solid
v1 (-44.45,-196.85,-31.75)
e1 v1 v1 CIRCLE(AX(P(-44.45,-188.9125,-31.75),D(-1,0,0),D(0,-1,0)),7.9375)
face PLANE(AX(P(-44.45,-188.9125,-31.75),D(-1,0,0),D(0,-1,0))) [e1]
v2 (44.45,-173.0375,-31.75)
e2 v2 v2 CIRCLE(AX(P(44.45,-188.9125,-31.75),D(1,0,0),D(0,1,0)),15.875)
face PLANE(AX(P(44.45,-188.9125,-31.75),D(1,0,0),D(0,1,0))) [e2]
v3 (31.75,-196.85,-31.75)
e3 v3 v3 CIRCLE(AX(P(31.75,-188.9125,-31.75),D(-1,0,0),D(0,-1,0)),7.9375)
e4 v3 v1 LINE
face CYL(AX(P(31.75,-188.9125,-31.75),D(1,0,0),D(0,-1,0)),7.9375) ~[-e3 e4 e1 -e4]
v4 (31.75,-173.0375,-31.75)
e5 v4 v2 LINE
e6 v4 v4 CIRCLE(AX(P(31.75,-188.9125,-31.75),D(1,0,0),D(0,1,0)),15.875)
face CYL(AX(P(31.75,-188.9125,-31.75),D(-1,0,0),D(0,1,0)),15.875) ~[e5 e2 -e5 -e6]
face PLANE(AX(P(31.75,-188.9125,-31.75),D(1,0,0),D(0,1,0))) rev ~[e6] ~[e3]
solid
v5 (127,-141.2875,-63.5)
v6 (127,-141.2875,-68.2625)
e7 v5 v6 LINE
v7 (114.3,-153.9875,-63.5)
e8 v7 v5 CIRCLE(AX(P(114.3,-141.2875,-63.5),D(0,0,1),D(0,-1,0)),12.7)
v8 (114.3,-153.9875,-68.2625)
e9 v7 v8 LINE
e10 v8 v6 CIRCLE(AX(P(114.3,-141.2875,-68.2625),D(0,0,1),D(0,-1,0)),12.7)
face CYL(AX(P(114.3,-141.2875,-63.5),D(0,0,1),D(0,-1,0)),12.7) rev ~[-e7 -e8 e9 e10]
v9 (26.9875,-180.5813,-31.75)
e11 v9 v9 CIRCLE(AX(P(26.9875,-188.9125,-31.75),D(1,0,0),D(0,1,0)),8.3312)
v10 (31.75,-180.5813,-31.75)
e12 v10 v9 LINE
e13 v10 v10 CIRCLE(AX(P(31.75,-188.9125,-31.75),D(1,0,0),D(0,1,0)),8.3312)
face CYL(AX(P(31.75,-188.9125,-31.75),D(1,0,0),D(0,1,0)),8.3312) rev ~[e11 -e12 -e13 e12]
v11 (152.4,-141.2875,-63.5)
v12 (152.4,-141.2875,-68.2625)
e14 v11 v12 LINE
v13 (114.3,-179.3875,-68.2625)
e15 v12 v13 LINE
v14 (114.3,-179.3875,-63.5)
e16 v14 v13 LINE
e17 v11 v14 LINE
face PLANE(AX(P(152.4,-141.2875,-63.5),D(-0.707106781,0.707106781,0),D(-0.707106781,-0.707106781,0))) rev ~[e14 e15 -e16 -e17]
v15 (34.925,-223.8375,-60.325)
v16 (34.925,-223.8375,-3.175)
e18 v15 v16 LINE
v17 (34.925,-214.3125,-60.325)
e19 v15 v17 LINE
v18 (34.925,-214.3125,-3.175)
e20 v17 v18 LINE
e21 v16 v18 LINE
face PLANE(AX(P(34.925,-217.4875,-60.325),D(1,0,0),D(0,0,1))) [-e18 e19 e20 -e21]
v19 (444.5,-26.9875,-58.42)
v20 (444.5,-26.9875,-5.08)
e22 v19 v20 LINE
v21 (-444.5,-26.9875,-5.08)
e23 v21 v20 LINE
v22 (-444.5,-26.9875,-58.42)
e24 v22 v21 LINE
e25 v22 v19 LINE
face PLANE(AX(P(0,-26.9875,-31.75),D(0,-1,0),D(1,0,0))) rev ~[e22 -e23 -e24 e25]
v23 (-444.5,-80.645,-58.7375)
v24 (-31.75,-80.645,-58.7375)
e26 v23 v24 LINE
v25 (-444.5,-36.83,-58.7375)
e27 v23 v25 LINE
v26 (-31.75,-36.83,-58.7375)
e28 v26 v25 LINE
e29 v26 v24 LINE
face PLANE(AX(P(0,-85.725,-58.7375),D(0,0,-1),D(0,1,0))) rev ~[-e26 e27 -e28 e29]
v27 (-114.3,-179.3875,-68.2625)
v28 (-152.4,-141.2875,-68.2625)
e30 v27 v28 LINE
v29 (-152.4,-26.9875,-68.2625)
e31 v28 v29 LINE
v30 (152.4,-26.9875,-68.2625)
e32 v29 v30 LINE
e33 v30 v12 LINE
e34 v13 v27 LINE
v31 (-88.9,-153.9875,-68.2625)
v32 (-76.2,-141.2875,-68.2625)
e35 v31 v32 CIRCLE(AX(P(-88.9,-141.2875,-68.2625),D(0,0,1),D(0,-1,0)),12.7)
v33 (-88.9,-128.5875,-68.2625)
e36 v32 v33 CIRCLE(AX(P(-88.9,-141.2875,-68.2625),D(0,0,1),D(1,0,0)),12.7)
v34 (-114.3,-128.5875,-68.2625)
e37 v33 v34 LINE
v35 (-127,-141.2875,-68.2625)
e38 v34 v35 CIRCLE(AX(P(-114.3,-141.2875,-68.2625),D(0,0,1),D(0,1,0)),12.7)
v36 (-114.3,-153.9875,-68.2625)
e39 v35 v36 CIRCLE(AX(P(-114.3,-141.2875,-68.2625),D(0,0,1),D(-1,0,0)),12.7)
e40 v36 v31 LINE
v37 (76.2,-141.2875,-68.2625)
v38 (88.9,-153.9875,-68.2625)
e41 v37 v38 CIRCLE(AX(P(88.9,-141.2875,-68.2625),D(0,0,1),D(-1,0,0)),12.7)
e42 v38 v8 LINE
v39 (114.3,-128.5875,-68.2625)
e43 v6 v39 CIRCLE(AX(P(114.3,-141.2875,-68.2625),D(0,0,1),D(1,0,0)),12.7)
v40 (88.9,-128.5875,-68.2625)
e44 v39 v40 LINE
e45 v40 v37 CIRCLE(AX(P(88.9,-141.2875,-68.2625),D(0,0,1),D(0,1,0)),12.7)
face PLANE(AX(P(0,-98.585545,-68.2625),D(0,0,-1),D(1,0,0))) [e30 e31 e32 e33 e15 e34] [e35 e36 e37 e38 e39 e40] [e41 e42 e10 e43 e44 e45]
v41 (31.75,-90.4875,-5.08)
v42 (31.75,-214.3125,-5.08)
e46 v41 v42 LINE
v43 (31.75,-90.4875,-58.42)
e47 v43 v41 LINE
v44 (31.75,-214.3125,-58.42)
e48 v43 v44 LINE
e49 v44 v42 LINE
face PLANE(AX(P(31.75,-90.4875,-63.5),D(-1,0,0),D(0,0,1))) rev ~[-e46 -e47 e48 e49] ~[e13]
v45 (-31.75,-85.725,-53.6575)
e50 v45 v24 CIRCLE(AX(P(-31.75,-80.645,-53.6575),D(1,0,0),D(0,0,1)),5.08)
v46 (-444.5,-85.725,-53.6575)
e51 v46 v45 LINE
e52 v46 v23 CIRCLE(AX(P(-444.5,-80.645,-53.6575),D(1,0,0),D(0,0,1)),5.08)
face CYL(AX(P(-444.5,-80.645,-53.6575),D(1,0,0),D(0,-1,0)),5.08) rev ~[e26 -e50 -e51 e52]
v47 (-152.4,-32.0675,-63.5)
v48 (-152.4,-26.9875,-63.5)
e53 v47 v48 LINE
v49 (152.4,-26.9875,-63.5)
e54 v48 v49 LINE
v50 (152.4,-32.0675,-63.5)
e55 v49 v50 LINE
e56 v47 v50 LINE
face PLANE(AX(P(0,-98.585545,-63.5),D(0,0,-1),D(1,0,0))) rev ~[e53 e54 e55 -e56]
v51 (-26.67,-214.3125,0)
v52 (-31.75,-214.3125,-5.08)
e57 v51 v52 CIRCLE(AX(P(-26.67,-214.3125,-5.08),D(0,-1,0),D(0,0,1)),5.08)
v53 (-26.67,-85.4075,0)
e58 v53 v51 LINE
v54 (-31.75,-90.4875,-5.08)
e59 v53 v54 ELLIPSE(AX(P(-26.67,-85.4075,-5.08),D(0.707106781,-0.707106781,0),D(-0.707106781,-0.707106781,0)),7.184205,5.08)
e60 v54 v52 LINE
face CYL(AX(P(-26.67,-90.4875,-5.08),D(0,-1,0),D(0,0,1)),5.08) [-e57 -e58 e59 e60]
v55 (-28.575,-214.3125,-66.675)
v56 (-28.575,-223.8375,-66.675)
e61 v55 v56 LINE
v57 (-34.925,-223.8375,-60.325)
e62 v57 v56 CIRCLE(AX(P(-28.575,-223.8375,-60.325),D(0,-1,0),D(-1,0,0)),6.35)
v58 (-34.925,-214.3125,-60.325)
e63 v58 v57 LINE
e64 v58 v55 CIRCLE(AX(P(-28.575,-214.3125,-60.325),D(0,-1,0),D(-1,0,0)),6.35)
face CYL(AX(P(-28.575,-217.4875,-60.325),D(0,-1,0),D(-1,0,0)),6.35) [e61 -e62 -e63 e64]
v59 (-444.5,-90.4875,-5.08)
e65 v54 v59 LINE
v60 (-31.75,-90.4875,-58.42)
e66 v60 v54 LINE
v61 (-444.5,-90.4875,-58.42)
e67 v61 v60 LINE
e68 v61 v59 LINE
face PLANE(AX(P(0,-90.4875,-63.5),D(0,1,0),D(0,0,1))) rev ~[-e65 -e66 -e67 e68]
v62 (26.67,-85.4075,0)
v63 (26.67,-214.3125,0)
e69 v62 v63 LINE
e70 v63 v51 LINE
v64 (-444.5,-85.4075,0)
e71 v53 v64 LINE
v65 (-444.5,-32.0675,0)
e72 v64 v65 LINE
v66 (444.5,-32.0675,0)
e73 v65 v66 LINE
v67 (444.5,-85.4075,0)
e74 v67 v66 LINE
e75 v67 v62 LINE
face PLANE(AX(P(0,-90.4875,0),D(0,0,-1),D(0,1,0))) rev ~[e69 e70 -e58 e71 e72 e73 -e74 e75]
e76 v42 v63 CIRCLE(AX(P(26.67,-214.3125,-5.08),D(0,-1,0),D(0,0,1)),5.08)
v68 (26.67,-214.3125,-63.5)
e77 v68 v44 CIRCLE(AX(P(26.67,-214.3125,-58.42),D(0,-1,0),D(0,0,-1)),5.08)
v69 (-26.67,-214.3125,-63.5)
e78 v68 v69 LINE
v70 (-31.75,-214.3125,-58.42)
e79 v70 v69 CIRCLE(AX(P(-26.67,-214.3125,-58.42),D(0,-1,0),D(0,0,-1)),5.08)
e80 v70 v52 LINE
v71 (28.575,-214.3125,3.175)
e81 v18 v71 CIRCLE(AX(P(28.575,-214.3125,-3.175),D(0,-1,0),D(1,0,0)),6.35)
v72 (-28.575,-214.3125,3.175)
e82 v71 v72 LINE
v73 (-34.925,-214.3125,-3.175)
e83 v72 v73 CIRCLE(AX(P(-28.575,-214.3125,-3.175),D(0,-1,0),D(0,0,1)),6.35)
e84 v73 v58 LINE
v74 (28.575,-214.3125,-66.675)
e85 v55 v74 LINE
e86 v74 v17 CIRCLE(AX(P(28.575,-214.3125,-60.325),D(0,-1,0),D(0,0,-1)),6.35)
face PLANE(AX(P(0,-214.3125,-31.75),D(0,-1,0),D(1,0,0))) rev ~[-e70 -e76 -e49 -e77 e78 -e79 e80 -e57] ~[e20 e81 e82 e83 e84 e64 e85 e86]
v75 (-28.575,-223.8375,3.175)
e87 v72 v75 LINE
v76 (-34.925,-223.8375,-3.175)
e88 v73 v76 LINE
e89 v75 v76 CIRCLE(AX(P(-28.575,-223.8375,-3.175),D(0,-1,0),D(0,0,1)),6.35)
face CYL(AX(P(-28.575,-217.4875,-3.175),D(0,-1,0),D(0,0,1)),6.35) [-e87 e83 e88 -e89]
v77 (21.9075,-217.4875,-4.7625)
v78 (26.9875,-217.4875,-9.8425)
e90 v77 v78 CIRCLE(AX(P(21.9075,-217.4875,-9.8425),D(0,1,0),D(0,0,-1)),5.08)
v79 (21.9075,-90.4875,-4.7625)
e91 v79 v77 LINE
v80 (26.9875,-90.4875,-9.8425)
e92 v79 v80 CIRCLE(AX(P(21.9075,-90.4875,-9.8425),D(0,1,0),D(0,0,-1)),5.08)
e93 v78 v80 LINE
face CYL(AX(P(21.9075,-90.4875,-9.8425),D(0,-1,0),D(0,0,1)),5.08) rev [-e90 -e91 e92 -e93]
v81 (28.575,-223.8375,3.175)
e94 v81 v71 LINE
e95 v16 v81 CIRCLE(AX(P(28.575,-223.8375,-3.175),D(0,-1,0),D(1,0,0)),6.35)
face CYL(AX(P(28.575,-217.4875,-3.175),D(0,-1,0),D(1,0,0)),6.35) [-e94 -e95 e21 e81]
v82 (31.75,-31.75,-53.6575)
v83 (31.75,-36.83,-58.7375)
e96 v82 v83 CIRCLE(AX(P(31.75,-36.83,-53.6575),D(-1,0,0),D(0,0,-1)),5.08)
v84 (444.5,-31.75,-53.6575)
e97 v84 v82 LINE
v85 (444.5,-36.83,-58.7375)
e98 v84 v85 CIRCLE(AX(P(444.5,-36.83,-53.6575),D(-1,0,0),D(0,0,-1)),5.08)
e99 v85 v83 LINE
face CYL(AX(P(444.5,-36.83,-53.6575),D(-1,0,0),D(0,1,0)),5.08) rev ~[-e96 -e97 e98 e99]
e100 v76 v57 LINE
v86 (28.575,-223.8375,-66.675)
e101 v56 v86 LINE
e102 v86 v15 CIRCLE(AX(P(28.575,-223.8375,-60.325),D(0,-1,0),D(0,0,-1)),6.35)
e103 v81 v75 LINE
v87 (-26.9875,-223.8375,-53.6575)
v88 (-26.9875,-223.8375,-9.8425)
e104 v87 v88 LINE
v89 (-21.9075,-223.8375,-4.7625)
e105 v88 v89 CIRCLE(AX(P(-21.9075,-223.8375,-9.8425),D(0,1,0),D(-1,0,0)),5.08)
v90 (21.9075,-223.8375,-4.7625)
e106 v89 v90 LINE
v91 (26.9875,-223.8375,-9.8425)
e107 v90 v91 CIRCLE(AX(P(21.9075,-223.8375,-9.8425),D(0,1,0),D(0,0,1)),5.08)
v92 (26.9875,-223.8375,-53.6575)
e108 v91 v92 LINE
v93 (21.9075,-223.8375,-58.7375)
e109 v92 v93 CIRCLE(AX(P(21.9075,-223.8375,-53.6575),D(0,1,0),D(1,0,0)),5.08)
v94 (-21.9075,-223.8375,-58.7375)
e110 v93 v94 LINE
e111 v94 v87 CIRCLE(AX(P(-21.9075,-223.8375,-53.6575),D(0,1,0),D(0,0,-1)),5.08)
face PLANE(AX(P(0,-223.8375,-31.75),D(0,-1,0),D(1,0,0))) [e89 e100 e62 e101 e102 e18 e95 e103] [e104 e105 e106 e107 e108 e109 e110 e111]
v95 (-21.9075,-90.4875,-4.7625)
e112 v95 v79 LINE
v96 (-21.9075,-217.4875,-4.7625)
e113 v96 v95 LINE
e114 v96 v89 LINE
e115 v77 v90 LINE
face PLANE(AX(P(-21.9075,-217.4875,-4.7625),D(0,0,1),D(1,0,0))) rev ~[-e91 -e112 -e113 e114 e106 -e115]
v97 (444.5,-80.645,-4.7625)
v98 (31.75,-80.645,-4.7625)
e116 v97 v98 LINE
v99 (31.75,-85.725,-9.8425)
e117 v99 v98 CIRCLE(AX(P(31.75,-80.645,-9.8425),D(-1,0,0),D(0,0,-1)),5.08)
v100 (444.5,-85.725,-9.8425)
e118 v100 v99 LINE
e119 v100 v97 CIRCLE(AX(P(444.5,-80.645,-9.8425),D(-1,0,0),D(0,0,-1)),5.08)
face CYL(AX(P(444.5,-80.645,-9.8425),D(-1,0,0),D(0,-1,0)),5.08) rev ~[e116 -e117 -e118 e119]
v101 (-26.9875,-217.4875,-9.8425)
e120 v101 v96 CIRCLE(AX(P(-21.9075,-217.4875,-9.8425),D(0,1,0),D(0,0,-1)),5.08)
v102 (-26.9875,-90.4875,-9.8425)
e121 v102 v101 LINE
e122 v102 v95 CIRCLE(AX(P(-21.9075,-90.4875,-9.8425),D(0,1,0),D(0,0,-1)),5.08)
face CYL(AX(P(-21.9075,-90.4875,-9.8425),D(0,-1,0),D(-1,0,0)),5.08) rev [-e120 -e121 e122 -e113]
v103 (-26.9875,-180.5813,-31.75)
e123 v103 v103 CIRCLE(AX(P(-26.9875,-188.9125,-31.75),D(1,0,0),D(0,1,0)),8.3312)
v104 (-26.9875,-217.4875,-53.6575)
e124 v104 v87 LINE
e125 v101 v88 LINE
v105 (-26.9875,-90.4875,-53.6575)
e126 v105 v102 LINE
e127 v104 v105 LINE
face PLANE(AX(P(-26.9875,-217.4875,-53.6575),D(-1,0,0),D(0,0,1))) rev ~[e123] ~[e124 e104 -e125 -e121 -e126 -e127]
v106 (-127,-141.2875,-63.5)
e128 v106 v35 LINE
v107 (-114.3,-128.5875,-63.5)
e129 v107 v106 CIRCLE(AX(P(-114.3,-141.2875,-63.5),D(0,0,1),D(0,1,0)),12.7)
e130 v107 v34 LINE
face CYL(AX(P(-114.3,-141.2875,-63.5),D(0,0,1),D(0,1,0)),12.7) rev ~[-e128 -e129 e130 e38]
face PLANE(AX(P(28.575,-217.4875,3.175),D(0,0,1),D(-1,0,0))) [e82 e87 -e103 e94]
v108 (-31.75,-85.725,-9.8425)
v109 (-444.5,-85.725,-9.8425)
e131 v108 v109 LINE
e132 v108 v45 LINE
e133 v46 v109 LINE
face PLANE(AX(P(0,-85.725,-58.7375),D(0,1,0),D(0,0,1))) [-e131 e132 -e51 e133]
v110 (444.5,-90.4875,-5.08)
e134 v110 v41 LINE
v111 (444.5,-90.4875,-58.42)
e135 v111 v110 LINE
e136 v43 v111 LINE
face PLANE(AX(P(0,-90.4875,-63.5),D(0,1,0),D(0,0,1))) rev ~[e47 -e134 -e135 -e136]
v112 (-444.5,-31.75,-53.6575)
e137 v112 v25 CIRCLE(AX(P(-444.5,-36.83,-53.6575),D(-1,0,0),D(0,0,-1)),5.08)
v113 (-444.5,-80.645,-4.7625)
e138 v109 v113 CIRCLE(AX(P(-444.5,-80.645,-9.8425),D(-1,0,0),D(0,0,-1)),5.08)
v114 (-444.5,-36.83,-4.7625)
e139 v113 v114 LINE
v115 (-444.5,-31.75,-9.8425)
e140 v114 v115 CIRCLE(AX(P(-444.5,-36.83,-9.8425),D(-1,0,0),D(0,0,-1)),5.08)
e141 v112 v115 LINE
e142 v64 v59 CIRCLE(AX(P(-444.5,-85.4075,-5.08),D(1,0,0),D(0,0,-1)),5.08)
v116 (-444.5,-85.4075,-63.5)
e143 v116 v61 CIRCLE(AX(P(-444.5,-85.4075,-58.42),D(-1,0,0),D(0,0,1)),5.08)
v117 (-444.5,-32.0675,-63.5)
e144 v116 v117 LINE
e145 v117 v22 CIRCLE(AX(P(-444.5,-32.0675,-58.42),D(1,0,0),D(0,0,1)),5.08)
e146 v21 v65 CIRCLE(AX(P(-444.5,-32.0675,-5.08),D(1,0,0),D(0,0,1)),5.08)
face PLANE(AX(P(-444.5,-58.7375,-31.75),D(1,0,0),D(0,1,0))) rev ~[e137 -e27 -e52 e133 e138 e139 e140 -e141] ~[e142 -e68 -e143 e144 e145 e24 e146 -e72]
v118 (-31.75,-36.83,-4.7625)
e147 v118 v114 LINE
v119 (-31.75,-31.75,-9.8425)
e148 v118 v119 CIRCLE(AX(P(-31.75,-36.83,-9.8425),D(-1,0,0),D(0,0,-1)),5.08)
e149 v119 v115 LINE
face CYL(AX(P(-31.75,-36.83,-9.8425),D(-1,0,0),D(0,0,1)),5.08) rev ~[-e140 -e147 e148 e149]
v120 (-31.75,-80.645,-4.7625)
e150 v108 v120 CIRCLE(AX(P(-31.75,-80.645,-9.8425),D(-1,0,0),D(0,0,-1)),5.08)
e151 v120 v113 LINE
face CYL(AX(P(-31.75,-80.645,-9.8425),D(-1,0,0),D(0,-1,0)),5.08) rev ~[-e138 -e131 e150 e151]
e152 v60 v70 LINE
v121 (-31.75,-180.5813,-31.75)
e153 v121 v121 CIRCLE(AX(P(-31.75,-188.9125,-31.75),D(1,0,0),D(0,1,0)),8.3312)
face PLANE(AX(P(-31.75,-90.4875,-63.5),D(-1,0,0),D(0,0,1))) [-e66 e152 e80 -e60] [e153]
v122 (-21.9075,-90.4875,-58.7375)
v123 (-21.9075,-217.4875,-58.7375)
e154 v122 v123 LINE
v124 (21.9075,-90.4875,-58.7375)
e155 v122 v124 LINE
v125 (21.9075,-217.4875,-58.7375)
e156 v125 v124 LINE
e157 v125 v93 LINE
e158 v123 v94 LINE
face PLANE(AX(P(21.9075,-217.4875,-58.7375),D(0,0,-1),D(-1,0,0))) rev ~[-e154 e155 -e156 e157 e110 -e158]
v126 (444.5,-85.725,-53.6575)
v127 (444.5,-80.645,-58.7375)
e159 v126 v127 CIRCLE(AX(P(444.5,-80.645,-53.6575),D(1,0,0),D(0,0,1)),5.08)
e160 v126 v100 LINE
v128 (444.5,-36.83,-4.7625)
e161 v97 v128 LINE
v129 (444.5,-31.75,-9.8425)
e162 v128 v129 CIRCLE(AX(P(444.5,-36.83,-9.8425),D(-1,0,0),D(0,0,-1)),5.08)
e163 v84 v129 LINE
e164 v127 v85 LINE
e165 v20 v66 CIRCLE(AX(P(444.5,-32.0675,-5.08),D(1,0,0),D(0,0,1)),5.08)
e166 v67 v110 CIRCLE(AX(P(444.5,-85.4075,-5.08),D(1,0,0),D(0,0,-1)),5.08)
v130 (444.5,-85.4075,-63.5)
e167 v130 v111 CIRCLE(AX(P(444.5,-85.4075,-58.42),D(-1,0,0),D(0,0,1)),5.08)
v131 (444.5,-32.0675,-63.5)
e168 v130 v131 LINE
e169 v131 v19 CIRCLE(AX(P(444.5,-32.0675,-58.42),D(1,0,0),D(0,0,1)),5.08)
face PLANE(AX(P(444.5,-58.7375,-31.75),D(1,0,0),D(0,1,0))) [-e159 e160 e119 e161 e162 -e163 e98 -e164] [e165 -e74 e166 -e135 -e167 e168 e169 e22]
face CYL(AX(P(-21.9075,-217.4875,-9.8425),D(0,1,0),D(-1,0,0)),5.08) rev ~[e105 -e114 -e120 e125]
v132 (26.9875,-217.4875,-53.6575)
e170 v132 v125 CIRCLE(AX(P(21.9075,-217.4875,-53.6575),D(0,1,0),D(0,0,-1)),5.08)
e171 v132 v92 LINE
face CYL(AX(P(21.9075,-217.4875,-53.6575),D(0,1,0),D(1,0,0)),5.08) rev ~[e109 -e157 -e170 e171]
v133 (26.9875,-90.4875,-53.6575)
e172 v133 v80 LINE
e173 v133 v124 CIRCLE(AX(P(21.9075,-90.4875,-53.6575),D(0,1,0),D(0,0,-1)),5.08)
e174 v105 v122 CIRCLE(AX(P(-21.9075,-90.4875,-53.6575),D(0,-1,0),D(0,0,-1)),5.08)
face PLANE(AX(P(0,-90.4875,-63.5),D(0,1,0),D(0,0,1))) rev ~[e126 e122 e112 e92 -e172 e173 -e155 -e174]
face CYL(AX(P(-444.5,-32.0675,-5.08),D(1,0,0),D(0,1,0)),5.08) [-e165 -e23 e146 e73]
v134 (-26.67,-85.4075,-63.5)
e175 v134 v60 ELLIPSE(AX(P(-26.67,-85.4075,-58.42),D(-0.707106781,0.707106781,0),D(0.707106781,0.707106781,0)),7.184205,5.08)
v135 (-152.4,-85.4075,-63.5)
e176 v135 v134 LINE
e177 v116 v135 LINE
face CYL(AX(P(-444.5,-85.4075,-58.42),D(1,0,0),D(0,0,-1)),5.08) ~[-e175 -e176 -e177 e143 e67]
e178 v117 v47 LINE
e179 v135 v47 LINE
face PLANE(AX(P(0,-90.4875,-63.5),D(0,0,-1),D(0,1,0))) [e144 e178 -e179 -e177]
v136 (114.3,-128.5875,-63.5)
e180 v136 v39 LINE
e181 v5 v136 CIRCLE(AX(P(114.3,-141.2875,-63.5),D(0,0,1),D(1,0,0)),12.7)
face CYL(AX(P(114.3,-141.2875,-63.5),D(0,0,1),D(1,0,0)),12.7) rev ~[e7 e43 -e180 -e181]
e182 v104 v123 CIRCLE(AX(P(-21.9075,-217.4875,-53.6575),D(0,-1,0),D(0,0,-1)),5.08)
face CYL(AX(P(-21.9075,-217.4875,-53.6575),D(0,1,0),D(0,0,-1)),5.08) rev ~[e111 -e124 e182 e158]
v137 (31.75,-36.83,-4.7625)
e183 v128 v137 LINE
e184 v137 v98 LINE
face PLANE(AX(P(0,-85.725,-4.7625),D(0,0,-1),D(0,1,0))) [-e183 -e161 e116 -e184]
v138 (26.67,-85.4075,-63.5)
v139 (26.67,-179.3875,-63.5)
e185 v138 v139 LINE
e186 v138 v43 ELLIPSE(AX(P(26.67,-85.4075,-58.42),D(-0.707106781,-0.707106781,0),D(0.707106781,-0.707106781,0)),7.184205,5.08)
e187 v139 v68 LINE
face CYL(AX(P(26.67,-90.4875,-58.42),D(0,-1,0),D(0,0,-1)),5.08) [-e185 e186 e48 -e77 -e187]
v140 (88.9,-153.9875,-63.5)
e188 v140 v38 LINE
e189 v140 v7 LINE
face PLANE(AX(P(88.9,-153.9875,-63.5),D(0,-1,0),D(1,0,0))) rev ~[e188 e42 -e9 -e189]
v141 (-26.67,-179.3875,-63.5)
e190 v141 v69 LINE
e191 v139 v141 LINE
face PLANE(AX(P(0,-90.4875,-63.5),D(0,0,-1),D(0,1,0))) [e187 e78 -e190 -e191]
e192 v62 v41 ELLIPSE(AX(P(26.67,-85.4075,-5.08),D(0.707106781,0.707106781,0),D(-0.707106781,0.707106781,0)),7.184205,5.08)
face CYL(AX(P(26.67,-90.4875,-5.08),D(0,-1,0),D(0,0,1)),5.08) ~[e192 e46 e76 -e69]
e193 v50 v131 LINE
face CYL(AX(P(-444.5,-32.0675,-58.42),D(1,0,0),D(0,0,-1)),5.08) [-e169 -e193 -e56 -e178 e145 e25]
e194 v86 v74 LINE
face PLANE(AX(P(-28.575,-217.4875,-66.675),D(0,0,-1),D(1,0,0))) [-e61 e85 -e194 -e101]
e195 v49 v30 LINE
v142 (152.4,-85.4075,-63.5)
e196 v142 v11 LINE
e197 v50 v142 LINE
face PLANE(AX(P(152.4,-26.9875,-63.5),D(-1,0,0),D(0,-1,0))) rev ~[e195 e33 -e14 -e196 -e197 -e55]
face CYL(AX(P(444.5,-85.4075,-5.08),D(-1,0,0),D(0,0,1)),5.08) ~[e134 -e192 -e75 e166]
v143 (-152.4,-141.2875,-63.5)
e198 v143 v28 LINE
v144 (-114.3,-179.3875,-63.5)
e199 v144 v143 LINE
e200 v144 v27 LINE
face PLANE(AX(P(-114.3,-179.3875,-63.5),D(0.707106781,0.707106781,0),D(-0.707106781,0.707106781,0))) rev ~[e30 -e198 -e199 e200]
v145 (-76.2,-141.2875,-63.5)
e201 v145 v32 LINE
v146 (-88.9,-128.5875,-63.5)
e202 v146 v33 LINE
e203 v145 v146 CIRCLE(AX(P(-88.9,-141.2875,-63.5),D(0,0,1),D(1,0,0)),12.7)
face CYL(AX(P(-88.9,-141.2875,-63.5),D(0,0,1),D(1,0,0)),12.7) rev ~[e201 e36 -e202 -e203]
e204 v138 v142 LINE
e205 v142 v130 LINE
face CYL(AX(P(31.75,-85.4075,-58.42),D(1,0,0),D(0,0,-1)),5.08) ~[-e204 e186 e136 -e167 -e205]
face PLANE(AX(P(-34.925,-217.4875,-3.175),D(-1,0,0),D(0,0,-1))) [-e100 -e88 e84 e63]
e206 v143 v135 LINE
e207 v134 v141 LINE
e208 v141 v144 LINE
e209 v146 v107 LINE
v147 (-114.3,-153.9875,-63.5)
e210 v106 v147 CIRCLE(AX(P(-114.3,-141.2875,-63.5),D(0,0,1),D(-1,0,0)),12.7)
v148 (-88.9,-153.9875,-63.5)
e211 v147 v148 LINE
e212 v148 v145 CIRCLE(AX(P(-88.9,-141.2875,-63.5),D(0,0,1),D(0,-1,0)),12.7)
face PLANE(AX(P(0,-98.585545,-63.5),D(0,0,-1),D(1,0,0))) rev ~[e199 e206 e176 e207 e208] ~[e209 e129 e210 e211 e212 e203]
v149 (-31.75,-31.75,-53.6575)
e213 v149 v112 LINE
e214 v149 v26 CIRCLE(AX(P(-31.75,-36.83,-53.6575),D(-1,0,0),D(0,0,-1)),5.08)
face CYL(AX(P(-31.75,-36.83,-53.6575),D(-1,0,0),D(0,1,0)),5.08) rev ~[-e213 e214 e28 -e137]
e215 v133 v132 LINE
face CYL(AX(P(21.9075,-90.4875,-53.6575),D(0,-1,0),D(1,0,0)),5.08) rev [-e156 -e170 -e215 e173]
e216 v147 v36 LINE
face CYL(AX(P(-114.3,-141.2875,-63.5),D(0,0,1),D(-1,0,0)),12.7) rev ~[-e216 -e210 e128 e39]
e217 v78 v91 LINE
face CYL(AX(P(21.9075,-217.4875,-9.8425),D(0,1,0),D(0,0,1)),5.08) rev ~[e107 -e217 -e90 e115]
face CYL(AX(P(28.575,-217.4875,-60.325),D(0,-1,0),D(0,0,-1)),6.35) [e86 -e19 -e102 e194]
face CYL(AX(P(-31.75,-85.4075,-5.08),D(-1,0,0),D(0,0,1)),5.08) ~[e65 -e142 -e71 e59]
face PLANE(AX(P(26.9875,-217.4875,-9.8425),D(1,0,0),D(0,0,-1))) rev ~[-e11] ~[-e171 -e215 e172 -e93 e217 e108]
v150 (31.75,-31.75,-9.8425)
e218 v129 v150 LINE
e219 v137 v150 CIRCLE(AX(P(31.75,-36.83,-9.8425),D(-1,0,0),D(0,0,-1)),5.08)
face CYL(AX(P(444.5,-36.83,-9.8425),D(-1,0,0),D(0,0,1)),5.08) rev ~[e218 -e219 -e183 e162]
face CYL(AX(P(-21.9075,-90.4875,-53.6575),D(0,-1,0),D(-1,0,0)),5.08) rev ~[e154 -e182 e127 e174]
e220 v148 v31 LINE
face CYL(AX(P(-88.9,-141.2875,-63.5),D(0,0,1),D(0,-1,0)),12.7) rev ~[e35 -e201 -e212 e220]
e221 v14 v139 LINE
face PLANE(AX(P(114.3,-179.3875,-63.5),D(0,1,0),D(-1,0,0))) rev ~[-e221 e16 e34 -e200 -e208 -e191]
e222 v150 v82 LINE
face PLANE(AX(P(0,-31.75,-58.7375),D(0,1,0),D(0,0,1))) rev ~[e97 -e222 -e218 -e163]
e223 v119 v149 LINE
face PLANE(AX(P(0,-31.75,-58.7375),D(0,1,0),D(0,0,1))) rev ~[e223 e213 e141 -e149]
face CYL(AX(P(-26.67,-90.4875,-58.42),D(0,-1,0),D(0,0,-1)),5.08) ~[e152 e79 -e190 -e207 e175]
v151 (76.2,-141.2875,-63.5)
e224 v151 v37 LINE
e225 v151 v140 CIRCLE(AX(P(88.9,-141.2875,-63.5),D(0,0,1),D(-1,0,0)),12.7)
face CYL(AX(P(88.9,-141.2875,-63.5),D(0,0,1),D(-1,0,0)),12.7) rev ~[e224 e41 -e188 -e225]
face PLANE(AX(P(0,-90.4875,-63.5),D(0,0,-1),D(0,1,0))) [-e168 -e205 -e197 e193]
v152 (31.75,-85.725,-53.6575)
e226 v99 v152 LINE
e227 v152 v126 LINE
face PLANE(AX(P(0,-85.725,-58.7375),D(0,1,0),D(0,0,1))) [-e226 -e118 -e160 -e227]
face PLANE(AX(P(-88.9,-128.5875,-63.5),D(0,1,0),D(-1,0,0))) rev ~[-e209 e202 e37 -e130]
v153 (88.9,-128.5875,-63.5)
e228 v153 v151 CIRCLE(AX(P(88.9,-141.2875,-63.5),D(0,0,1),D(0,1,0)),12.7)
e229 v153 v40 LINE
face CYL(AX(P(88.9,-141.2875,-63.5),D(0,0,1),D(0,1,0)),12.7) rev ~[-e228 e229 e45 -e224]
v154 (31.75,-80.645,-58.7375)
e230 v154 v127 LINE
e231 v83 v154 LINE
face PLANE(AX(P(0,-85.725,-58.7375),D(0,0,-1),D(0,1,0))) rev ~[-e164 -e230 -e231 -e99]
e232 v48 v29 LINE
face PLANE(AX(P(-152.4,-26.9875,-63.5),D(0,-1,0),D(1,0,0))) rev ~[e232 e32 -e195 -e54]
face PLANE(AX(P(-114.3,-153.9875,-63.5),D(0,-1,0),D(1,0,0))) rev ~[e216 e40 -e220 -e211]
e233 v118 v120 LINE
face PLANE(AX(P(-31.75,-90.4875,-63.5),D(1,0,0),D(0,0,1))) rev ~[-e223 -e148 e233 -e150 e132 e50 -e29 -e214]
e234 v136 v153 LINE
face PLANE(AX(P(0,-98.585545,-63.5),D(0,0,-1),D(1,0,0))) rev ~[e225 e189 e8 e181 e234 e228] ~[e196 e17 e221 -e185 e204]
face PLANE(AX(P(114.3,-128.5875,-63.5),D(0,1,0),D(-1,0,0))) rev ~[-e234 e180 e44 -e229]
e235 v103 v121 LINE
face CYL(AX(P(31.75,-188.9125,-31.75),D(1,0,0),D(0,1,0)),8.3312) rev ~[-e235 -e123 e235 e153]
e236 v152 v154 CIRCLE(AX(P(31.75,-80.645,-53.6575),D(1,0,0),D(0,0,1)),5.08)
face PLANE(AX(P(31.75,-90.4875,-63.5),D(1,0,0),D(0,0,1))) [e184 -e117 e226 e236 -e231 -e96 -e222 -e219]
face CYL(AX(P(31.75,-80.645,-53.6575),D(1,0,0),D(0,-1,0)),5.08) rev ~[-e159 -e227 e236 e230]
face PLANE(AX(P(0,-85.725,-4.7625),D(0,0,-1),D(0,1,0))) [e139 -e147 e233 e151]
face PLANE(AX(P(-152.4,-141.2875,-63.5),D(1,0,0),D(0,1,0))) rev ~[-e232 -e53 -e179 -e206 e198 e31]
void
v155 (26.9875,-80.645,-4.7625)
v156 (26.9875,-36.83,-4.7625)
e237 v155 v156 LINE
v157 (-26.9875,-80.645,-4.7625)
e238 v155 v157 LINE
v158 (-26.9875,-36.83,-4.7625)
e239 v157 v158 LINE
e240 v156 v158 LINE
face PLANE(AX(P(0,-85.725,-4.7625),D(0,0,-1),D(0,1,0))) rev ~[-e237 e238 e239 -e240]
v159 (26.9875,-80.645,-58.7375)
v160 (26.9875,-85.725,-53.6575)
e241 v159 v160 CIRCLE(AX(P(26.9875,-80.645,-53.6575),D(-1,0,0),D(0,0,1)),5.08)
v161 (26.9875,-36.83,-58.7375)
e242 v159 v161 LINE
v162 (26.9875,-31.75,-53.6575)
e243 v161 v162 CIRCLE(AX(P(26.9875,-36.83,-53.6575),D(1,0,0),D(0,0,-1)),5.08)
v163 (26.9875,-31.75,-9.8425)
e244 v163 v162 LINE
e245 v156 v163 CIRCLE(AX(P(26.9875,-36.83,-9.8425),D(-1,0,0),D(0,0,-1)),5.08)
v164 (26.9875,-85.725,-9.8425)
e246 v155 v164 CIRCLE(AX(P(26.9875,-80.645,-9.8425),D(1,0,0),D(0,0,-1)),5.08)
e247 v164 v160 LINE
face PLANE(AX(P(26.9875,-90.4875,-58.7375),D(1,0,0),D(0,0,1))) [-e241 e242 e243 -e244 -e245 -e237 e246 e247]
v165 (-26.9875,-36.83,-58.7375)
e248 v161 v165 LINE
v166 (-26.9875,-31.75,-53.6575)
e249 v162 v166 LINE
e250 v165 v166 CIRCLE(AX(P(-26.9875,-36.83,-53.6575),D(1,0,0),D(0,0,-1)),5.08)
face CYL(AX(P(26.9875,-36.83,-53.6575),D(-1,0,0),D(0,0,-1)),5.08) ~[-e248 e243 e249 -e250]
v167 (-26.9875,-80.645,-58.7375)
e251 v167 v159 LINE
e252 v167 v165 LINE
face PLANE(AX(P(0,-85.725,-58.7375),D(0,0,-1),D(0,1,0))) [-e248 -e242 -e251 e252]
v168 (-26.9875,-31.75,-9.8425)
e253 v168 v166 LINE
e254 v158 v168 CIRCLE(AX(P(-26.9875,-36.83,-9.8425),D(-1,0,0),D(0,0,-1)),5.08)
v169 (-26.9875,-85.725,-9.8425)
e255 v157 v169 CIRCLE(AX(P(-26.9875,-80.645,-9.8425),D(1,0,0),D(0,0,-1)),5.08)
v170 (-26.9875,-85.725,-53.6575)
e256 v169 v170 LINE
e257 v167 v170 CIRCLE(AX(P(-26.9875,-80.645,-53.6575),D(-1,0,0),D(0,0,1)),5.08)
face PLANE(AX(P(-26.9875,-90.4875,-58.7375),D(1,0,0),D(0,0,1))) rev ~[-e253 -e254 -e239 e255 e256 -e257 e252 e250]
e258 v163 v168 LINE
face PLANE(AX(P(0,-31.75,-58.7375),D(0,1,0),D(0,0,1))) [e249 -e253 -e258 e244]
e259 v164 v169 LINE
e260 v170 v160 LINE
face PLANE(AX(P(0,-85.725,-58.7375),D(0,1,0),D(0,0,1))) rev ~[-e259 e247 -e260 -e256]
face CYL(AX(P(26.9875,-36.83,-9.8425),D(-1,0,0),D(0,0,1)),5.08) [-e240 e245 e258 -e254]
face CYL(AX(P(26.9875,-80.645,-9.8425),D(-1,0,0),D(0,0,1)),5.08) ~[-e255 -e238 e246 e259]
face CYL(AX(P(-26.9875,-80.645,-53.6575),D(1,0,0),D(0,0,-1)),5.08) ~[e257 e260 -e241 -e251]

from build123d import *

# Parameters (mm, degrees)
F0_W          = 63.5
F0_H          = 63.5
F0_W_2        = 53.975
F0_H_2        = 53.975
F1_DEPTH      = 444.5
F2_W          = 63.5
F2_H          = 63.5
F2_W_2        = 53.975
F2_H_2        = 53.975
F3_DEPTH      = 127
F3_DEPTH_BACK = 63.5
F4_R          = 5.08
F7_DEPTH      = 4.7625
F9_DEPTH      = 6.35
F9_DEPTH_BACK = 3.175
F11_R         = 8.3312
F12_DEPTH     = 476.251
F13_R         = 15.875
F14_DEPTH     = 12.7
F15_R         = 7.9375
F16_DEPTH     = 76.2


with BuildPart() as f1:
    # F0 (on Right) → F1 (new body, symmetric)
    with BuildSketch(Plane.YZ):
        with Locations((-58.7375, -31.75)):
            Rectangle(F0_W, F0_H)
        with Locations((-58.7375, -31.75)):
            Rectangle(F0_W_2, F0_H_2, mode=Mode.SUBTRACT)
    extrude(amount=F1_DEPTH, both=True)

    # F2 (on face) → F3 (join, two sides)
    with BuildSketch(Plane.XZ.offset(90.4875)) as f3_sk:
        with Locations((0, -31.75)):
            Rectangle(F2_W, F2_H)
        with Locations((0, -31.75)):
            Rectangle(F2_W_2, F2_H_2, mode=Mode.SUBTRACT)
    extrude(amount=F3_DEPTH)
    extrude(f3_sk.sketch, amount=-F3_DEPTH_BACK)

    # F4
    f4_edges = [f1.edges().sort_by_distance(p)[0] for p in [
        (-238.125, -90.4875, 0),
        (238.125, -90.4875, 0),
        (0, -26.9875, 0),
        (0, -26.9875, -63.5),
        (-238.125, -90.4875, -63.5),
        (238.125, -90.4875, -63.5),
        (0, -31.75, -4.7625),
        (0, -85.725, -4.7625),
        (0, -31.75, -58.7375),
        (0, -85.725, -58.7375),
        (-31.75, -153.9875, 0),
        (31.75, -153.9875, 0),
        (31.75, -153.9875, -63.5),
        (-31.75, -153.9875, -63.5),
        (-26.9875, -153.9875, -4.7625),
        (26.9875, -153.9875, -4.7625),
        (-26.9875, -153.9875, -58.7375),
        (26.9875, -153.9875, -58.7375),
        (238.125, -85.725, -58.7375),
        (238.125, -85.725, -4.7625),
        (238.125, -31.75, -58.7375),
        (238.125, -31.75, -4.7625),
        (-238.125, -85.725, -4.7625),
        (-238.125, -85.725, -58.7375),
        (-238.125, -31.75, -58.7375),
        (-238.125, -31.75, -4.7625),
    ]]
    fillet(f4_edges, radius=F4_R)

    # F6 (on face) → F7 (join)
    with BuildSketch(Plane(origin=(0, 0, -63.5), x_dir=(1, 0, 0), z_dir=(0, 0, -1))):
        Polygon((-152.4, 26.9875), (152.4, 26.9875), (152.4, 141.2875), (114.3, 179.3875), (-114.3, 179.3875), (-152.4, 141.2875), align=None)
        with BuildLine():
            ThreePointArc((-127, 141.2875), (-123.2802561211, 150.2677561211), (-114.3, 153.9875))
            Line((-114.3, 153.9875), (-88.9, 153.9875))
            ThreePointArc((-88.9, 153.9875), (-79.9197438789, 150.2677561211), (-76.2, 141.2875))
            ThreePointArc((-76.2, 141.2875), (-79.9197438789, 132.3072438789), (-88.9, 128.5875))
            Line((-88.9, 128.5875), (-114.3, 128.5875))
            ThreePointArc((-114.3, 128.5875), (-123.2802561211, 132.3072438789), (-127, 141.2875))
        make_face(mode=Mode.SUBTRACT)
        with BuildLine():
            Line((114.3, 128.5875), (88.9, 128.5875))
            ThreePointArc((88.9, 128.5875), (79.9197438789, 132.3072438789), (76.2, 141.2875))
            ThreePointArc((76.2, 141.2875), (79.9197438789, 150.2677561211), (88.9, 153.9875))
            Line((88.9, 153.9875), (114.3, 153.9875))
            ThreePointArc((114.3, 153.9875), (123.2802561211, 150.2677561211), (127, 141.2875))
            ThreePointArc((127, 141.2875), (123.2802561211, 132.3072438789), (114.3, 128.5875))
        make_face(mode=Mode.SUBTRACT)
    extrude(amount=F7_DEPTH)

    # F8 (on face) → F9 (join, two sides)
    with BuildSketch(Plane.XZ.offset(217.4875)) as f9_sk:
        with BuildLine():
            Line((28.575, 3.175), (-28.575, 3.175))
            ThreePointArc((-28.575, 3.175), (-33.0651280605, 1.3151280605), (-34.925, -3.175))
            Line((-34.925, -3.175), (-34.925, -60.325))
            ThreePointArc((-34.925, -60.325), (-33.0651280605, -64.8151280605), (-28.575, -66.675))
            Line((-28.575, -66.675), (28.575, -66.675))
            ThreePointArc((28.575, -66.675), (33.0651280605, -64.8151280605), (34.925, -60.325))
            Line((34.925, -60.325), (34.925, -3.175))
            ThreePointArc((34.925, -3.175), (33.0651280605, 1.3151280605), (28.575, 3.175))
        make_face()
        with BuildLine():
            ThreePointArc((-26.9875, -9.8425), (-25.4996024484, -6.2503975516), (-21.9075, -4.7625))
            Line((-21.9075, -4.7625), (21.9075, -4.7625))
            ThreePointArc((21.9075, -4.7625), (25.4996024484, -6.2503975516), (26.9875, -9.8425))
            Line((26.9875, -9.8425), (26.9875, -53.6575))
            ThreePointArc((26.9875, -53.6575), (25.4996024484, -57.2496024484), (21.9075, -58.7375))
            Line((21.9075, -58.7375), (-21.9075, -58.7375))
            ThreePointArc((-21.9075, -58.7375), (-25.4996024484, -57.2496024484), (-26.9875, -53.6575))
            Line((-26.9875, -53.6575), (-26.9875, -9.8425))
        make_face(mode=Mode.SUBTRACT)
    extrude(amount=F9_DEPTH)
    extrude(f9_sk.sketch, amount=-F9_DEPTH_BACK)

    # F11 (on face) → F12 (cut, through all)
    with BuildSketch(Plane.YZ.offset(31.75)):
        with Locations((-188.9125, -31.75)):
            Circle(F11_R)
    extrude(amount=-F12_DEPTH, mode=Mode.SUBTRACT)


with BuildPart() as f14:
    # F13 (on face) → F14 (new body)
    with BuildSketch(Plane.YZ.offset(31.75)):
        with Locations((-188.9125, -31.75)):
            Circle(F13_R)
    extrude(amount=F14_DEPTH)

    # F15 (on face) → F16 (join)
    with BuildSketch(Plane(origin=(31.75, 0, 0), x_dir=(0, -1, 0), z_dir=(-1, 0, 0))):
        with Locations((188.9125, -31.75)):
            Circle(F15_R)
    extrude(amount=F16_DEPTH)


solid = Compound([f1.part, f14.part])
